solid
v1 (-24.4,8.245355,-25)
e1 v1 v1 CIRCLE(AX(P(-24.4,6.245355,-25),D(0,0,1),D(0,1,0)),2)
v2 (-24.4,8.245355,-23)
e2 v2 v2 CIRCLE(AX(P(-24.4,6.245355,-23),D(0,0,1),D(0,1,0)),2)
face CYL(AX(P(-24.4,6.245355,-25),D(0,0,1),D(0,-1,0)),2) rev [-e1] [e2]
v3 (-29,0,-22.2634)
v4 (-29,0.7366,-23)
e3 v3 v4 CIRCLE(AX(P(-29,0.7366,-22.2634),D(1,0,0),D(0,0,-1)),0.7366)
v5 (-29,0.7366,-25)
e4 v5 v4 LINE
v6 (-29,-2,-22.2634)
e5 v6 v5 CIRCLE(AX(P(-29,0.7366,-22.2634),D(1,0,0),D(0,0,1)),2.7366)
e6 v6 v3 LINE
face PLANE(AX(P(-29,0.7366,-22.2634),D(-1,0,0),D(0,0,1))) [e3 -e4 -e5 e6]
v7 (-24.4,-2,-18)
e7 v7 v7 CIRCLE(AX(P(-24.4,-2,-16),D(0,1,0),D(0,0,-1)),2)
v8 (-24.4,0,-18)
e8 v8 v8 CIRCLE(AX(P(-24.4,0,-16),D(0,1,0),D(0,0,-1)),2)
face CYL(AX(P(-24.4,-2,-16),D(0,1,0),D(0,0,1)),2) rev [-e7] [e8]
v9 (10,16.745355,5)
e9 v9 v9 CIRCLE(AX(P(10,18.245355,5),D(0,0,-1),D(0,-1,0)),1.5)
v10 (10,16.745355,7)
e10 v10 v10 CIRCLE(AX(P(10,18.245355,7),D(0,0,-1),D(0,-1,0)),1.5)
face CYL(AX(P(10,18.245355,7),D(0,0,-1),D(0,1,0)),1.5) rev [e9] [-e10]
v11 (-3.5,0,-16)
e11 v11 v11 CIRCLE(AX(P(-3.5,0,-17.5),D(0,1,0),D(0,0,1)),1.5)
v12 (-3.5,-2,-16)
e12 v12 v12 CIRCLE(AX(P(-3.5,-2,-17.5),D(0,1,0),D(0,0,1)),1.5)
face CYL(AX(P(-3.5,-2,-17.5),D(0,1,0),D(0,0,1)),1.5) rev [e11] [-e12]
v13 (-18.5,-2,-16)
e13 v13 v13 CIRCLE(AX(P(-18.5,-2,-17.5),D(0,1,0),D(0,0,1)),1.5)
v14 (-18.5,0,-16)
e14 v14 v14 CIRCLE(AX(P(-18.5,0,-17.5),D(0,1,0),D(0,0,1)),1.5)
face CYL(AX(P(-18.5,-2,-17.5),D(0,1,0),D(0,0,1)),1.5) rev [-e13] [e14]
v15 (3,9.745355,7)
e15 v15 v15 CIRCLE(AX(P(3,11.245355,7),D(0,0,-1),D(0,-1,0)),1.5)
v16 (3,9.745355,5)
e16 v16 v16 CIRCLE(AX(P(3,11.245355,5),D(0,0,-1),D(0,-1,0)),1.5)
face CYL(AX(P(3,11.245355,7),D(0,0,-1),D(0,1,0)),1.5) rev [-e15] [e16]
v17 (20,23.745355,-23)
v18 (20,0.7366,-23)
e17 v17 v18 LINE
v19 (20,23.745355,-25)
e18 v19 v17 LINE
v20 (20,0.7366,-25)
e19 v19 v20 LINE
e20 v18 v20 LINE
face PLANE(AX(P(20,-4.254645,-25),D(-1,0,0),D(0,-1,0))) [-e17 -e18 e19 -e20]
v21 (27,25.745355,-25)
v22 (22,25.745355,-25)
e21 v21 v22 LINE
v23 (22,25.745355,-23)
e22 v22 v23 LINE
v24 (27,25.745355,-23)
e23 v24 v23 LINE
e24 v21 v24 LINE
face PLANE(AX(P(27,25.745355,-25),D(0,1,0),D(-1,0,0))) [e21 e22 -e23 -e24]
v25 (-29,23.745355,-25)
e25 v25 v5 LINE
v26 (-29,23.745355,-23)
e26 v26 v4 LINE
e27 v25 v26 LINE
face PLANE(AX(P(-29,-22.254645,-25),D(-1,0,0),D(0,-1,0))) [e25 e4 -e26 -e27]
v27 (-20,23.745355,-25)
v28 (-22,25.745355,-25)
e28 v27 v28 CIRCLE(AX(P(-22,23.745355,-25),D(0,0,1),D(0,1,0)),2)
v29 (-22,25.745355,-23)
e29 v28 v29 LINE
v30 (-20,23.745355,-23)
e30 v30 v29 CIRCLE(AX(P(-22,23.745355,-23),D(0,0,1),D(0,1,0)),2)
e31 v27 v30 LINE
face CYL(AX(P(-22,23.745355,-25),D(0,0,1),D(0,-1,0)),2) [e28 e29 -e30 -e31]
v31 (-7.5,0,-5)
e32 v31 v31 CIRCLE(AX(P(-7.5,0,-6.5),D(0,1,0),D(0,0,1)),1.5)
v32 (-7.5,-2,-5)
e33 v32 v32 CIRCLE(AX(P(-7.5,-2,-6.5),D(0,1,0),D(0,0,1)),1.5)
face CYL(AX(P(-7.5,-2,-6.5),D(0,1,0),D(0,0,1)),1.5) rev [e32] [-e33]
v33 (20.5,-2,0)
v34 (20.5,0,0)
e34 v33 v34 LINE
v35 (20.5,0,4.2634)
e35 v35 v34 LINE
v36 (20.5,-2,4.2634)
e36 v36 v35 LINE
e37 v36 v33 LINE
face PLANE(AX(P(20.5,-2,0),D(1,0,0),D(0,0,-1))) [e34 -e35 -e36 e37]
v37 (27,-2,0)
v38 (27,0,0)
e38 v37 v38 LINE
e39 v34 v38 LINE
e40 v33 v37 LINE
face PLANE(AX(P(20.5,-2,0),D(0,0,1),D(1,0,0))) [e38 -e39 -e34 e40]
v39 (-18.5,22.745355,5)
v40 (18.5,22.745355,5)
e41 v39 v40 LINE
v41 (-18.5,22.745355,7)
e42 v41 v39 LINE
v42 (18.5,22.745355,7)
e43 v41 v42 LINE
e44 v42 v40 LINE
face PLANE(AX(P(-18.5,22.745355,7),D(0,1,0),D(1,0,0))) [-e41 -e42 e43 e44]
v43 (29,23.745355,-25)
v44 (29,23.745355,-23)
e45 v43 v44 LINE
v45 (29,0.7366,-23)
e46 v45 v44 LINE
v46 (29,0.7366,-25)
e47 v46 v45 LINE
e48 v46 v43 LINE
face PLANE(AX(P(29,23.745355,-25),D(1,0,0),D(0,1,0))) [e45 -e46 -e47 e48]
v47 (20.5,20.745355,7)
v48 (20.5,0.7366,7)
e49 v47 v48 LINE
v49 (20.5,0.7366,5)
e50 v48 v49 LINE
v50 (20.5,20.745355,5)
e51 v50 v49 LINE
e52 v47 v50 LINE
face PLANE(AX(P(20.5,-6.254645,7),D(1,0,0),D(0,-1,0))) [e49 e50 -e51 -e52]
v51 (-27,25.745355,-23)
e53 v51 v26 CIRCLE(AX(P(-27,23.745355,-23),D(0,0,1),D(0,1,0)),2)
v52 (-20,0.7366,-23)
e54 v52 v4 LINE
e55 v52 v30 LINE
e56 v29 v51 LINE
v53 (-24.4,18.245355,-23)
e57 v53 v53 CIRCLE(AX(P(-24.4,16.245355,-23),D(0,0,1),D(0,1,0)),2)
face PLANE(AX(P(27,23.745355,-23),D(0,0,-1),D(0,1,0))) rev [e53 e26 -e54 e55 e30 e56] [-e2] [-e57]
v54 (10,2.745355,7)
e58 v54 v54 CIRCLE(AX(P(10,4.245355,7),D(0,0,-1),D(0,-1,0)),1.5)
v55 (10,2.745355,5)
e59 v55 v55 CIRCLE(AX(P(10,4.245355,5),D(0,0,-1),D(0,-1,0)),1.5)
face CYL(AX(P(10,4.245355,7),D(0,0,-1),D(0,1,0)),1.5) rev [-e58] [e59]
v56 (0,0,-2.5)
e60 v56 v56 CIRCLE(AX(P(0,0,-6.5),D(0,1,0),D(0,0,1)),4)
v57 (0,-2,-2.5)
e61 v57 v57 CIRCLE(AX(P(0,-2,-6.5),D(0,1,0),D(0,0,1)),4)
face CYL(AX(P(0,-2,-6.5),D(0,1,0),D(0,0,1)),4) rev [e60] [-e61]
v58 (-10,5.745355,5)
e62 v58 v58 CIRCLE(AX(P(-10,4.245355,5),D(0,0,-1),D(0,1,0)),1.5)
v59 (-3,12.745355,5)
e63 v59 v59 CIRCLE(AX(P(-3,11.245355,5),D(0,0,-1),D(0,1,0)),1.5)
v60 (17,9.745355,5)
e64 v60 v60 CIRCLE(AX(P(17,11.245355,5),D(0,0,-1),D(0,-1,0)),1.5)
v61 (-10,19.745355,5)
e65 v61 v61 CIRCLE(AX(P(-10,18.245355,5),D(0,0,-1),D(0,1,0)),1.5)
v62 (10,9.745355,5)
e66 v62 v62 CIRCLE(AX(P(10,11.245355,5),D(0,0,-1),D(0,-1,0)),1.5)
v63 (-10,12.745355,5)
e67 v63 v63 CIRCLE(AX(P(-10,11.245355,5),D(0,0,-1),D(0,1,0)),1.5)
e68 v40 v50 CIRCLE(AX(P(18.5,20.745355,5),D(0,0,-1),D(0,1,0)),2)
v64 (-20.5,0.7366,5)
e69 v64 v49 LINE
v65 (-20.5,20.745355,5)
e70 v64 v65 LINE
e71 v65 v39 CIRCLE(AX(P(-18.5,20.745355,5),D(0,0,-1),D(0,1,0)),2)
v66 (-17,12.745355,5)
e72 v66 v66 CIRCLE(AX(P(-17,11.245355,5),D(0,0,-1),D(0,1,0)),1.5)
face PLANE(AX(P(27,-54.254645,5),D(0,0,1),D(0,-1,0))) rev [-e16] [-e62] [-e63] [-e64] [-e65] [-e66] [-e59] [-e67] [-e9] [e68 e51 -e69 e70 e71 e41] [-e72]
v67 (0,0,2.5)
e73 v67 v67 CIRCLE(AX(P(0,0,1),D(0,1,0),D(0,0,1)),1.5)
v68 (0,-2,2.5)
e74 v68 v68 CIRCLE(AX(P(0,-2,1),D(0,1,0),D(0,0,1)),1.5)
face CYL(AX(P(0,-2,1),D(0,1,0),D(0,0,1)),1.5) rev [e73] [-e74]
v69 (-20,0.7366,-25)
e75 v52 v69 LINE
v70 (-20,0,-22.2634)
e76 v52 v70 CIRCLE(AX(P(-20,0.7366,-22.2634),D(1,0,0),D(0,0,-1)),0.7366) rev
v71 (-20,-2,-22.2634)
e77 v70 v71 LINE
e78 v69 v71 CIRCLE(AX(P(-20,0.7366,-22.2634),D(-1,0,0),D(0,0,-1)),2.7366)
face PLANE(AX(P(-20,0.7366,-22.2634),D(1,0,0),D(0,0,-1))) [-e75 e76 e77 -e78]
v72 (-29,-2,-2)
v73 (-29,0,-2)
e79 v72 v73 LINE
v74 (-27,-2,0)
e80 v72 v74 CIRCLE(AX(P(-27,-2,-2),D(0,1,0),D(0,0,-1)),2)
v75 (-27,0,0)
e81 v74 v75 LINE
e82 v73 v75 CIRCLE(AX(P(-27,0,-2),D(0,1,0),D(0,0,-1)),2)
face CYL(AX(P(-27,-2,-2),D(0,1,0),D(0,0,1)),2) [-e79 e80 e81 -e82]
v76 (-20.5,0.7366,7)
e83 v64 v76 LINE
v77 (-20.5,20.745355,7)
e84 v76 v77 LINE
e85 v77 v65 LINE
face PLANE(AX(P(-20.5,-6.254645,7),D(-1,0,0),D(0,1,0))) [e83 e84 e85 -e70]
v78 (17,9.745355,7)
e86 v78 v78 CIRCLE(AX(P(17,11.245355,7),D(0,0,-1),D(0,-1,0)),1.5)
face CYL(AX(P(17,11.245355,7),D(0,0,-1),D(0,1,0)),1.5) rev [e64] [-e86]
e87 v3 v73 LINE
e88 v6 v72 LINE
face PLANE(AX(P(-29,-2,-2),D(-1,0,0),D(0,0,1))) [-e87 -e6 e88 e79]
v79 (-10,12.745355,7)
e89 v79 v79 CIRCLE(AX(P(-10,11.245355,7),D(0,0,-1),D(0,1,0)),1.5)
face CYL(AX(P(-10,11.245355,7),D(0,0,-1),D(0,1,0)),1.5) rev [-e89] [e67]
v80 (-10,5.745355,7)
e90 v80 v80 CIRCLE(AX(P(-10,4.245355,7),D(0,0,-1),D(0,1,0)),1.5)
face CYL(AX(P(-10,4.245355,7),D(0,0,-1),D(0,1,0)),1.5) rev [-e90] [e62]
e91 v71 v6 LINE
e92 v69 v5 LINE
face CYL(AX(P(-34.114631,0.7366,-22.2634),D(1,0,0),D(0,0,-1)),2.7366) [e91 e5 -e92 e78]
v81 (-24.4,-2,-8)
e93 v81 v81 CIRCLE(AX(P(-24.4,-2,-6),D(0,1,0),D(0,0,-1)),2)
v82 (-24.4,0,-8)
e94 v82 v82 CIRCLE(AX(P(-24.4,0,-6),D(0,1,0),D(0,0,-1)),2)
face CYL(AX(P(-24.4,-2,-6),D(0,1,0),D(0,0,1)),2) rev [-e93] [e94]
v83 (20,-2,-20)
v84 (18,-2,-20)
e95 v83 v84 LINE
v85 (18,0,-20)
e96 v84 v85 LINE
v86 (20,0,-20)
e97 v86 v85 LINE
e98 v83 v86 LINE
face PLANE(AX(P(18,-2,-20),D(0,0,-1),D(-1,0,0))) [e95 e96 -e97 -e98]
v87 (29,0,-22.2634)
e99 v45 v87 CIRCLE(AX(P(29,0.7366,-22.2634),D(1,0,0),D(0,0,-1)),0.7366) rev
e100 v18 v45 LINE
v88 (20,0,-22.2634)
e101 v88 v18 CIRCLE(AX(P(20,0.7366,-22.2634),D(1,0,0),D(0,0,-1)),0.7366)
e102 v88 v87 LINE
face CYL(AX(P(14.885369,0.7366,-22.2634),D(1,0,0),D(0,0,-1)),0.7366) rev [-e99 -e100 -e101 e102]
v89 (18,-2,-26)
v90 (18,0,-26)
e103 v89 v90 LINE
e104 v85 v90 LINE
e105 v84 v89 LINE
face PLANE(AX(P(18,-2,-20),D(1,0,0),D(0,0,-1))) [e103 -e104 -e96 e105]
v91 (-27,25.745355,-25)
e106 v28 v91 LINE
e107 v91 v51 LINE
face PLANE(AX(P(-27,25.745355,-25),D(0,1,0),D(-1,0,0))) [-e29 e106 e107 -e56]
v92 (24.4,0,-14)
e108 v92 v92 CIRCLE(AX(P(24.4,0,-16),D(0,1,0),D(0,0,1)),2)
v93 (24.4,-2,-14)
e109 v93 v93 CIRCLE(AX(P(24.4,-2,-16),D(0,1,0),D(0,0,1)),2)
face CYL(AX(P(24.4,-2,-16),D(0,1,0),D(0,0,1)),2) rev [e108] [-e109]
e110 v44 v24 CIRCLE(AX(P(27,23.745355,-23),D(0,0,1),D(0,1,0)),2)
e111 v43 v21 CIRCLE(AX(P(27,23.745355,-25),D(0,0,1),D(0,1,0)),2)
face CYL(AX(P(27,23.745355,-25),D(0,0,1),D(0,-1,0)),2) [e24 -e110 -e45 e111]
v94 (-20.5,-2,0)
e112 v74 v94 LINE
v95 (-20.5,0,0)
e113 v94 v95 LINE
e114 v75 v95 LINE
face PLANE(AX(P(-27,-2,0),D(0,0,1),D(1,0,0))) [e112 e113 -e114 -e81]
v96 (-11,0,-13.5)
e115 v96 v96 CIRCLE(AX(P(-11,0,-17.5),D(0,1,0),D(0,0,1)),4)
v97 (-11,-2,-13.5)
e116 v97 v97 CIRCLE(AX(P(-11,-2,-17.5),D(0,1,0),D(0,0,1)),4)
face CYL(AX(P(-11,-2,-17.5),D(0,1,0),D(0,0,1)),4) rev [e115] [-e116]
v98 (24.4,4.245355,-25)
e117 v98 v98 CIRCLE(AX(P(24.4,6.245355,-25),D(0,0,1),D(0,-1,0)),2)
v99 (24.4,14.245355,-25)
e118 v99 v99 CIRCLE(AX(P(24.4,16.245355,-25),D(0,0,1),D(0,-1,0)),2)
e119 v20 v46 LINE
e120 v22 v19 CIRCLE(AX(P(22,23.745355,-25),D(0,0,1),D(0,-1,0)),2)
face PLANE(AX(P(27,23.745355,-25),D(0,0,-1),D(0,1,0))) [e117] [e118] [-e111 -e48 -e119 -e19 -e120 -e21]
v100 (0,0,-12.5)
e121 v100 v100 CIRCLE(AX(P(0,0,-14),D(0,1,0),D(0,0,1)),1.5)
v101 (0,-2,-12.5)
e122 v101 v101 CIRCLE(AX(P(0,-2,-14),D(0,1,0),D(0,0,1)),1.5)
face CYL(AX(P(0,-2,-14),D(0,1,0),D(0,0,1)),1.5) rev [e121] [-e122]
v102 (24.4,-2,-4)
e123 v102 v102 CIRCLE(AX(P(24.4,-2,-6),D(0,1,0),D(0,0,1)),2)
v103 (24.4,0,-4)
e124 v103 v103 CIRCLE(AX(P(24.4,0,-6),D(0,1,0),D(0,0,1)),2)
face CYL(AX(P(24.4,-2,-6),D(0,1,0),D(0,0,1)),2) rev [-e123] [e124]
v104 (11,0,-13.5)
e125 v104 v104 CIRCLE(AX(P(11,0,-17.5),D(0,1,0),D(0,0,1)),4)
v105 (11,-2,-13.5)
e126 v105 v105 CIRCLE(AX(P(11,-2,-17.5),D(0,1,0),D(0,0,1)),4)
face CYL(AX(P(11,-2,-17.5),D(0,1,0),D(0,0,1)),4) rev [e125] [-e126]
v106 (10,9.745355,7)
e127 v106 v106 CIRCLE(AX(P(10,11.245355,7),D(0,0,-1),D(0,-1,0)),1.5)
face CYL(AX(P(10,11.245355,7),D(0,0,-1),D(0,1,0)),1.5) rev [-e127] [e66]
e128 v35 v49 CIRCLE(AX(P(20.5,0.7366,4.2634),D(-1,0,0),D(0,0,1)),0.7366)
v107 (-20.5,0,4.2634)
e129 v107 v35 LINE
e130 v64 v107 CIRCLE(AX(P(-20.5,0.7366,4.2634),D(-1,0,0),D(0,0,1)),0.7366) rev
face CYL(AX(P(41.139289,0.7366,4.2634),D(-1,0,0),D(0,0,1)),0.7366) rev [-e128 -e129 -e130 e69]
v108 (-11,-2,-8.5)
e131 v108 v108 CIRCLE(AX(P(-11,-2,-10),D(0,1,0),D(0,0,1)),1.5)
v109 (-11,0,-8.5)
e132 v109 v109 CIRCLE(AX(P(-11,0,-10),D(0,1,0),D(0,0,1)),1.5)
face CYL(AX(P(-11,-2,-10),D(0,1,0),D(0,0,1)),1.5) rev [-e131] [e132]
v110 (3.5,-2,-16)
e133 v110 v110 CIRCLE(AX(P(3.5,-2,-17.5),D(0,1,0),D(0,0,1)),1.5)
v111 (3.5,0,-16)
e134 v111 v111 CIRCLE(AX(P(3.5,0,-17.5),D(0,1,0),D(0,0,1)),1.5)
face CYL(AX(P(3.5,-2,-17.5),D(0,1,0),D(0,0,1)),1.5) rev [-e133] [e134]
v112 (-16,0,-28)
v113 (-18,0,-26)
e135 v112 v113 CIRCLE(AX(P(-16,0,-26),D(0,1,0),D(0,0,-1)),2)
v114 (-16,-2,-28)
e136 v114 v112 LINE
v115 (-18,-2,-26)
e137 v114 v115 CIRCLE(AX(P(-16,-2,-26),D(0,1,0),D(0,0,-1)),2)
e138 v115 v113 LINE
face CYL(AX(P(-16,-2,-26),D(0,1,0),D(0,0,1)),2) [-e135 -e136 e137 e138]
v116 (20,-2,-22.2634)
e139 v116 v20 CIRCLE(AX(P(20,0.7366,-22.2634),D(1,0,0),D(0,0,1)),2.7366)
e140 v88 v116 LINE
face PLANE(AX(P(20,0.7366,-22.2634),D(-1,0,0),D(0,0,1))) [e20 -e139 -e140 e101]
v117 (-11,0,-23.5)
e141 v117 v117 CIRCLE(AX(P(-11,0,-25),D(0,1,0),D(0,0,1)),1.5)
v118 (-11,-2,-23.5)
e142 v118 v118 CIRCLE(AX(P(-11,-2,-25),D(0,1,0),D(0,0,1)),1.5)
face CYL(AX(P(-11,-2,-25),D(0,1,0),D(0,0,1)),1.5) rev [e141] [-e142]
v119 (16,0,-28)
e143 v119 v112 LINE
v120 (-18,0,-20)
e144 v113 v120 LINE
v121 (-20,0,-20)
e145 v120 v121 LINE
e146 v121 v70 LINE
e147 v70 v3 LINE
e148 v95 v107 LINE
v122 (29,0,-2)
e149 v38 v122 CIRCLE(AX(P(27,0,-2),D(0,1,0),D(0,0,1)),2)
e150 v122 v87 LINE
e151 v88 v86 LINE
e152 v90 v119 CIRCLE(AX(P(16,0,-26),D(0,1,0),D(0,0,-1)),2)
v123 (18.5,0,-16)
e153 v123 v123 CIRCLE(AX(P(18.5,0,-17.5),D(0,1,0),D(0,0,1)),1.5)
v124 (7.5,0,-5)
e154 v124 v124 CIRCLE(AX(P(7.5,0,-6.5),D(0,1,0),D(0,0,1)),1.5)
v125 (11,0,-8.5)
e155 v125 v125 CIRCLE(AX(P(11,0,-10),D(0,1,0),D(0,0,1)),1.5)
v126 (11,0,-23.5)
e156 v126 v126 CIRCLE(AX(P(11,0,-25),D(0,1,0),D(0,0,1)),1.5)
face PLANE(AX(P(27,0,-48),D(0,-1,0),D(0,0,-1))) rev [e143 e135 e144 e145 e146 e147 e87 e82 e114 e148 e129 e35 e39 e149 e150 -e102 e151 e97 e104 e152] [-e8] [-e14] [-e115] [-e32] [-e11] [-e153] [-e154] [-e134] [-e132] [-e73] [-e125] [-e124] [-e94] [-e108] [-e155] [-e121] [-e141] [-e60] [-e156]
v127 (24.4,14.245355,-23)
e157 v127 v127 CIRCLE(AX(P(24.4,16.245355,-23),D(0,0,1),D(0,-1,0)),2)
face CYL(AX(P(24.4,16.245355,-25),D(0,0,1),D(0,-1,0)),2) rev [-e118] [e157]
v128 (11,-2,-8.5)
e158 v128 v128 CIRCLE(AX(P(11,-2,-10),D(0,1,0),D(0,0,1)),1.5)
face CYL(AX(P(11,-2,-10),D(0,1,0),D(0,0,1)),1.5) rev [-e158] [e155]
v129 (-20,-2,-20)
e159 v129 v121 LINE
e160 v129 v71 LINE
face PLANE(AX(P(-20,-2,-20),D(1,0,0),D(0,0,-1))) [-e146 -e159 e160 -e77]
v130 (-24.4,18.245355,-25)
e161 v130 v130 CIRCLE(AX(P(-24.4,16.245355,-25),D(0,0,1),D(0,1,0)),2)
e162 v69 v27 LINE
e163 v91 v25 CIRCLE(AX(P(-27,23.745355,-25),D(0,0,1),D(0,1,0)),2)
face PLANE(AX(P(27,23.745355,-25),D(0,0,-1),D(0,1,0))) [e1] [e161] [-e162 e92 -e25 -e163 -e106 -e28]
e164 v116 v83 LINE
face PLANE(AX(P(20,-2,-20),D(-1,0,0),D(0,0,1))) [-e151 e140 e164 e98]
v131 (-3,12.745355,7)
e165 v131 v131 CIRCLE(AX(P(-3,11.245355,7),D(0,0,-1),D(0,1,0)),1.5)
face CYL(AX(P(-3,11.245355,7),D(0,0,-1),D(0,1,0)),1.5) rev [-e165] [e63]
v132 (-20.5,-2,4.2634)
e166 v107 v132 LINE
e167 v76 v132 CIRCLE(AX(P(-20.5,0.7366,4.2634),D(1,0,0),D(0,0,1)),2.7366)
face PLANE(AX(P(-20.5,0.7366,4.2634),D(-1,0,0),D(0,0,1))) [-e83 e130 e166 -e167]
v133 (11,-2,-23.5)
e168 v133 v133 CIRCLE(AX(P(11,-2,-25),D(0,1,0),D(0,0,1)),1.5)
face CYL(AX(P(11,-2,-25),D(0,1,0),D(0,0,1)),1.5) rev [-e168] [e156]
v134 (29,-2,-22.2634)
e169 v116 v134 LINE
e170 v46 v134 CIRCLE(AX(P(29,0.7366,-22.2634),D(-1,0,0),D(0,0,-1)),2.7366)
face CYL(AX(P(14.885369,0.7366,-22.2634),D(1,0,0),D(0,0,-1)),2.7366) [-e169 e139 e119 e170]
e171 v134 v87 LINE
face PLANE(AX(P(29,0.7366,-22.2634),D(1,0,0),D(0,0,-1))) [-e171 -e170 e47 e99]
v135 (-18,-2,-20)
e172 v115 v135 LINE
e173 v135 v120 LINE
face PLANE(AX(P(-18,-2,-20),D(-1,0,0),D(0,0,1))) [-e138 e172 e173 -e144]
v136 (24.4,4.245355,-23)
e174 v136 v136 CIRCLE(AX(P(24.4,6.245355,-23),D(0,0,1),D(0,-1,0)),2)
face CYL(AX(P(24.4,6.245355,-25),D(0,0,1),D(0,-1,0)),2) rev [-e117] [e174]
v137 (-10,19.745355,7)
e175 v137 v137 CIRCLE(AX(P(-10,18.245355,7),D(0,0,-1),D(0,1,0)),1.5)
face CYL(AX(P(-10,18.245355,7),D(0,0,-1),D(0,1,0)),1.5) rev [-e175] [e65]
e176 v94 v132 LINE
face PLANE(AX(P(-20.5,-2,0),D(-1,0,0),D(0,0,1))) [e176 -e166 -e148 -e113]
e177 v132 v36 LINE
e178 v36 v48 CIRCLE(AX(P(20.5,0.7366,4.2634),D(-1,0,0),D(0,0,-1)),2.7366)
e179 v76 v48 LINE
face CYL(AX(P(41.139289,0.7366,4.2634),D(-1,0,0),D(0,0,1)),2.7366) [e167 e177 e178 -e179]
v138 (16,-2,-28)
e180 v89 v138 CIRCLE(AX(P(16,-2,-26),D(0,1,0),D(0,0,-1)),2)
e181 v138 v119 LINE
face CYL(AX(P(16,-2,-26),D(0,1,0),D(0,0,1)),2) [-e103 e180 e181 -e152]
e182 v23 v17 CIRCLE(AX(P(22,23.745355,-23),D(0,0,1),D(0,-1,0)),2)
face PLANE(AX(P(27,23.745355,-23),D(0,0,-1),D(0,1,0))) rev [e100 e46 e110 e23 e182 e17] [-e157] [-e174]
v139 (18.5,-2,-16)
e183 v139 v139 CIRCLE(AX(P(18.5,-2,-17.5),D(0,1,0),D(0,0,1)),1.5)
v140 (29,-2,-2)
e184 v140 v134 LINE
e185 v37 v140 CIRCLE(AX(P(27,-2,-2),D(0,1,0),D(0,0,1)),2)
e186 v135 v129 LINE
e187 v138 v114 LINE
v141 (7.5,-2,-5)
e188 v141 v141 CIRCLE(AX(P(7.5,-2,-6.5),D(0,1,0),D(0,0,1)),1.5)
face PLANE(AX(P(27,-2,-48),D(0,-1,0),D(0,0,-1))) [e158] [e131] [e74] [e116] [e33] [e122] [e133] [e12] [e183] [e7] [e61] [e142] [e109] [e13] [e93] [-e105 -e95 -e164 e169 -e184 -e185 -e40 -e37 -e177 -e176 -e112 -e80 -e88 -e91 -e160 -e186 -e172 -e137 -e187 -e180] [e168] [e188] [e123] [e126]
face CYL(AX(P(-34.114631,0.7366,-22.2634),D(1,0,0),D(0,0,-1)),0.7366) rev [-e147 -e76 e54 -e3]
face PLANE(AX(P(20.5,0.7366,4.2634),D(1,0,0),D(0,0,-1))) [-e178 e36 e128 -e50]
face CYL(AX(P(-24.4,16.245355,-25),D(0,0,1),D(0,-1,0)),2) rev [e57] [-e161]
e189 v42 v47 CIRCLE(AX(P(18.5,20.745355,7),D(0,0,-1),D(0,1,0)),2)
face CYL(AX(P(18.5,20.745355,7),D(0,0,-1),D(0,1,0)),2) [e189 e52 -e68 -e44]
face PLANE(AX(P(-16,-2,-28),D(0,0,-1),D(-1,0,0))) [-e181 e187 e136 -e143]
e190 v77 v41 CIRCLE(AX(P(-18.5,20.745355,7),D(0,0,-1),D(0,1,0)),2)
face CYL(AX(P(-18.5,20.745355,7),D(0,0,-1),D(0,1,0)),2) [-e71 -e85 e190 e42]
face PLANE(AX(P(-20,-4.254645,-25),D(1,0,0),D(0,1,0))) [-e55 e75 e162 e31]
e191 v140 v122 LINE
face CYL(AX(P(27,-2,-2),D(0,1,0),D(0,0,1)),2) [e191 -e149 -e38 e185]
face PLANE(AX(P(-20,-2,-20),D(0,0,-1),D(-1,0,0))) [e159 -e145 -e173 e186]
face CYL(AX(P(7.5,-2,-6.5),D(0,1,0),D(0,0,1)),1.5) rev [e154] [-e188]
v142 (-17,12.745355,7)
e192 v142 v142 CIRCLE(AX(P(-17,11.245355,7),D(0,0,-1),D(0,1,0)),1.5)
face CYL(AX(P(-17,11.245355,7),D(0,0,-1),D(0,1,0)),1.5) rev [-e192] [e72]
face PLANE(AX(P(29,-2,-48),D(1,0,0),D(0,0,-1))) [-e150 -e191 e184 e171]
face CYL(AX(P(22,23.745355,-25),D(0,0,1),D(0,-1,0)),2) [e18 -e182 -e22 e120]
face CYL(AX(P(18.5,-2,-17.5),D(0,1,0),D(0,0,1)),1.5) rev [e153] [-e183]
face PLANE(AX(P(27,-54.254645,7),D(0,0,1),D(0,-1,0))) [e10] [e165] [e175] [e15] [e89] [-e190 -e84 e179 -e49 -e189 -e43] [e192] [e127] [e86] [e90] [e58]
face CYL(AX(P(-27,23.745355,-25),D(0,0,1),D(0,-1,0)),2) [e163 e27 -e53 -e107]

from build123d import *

# Parameters (mm, degrees)
SKETCH1_R                    = 1.5
SKETCH1_R_2                  = 2
SKETCH1_R_3                  = 4
BASE_FLANGE1_DEPTH           = 2
SKETCHED_START               = -20.5
SKETCHED_BEND1_DEPTH         = 41
SKETCHED_START_2             = -29
SKETCHED_BEND1_2_DEPTH       = 9
SKETCHED_START_3             = 20
SKETCHED_BEND1_3_DEPTH       = 9
SKETCHED_BEND1_4_DEPTH       = 41
SKETCHED_BEND1_5_DEPTH       = 9
SKETCHED_BEND1_6_DEPTH       = 9
SKETCHED_START_4             = -26
SKETCHED_BEND1_7_OUTLINE_R   = 1.5
SKETCHED_BEND1_7_OUTLINE_R_2 = 2
SKETCHED_BEND1_7_DEPTH       = 33
SKETCHED_START_5             = 5
SKETCHED_BEND1_8_DEPTH       = 2


with BuildPart() as part:
    # Base-Flange1: sheet metal written as solids
    # Sketch1 → Base-Flange1 (new body)
    with BuildSketch(Plane(origin=(0, 0, 0), x_dir=(1, 0, 0), z_dir=(0, 1, 0))):
        with BuildLine():
            Line((-27, 0), (-20.5, 0))
            Line((-20.5, 0), (-20.5, -27))
            ThreePointArc((-20.5, -27), (-19.914213562, -28.414213562), (-18.5, -29))
            Line((-18.5, -29), (18.5, -29))
            ThreePointArc((18.5, -29), (19.914213562, -28.414213562), (20.5, -27))
            Line((20.5, -27), (20.5, 0))
            Line((20.5, 0), (27, 0))
            ThreePointArc((27, 0), (28.414213562, 0.585786438), (29, 2))
            Line((29, 2), (29, 48))
            ThreePointArc((29, 48), (28.414213562, 49.414213562), (27, 50))
            Line((27, 50), (22, 50))
            ThreePointArc((22, 50), (20.585786438, 49.414213562), (20, 48))
            Line((20, 48), (20, 20))
            Line((20, 20), (18, 20))
            Line((18, 20), (18, 26))
            ThreePointArc((18, 26), (17.414213562, 27.414213562), (16, 28))
            Line((16, 28), (-16, 28))
            ThreePointArc((-16, 28), (-17.414213562, 27.414213562), (-18, 26))
            Line((-18, 26), (-18, 20))
            Line((-18, 20), (-20, 20))
            Line((-20, 20), (-20, 48))
            ThreePointArc((-20, 48), (-20.585786438, 49.414213562), (-22, 50))
            Line((-22, 50), (-27, 50))
            ThreePointArc((-27, 50), (-28.414213562, 49.414213562), (-29, 48))
            Line((-29, 48), (-29, 2))
            ThreePointArc((-29, 2), (-28.414213562, 0.585786438), (-27, 0))
        make_face()
        with Locations(Location((-17, -17.5, 0), (0, 0, 270))):
            Circle(SKETCH1_R, mode=Mode.SUBTRACT)
        with Locations(Location((-10, -17.5, 0), (0, 0, 270))):
            Circle(SKETCH1_R, mode=Mode.SUBTRACT)
        with Locations(Location((-10, -10.5, 0), (0, 0, 270))):
            Circle(SKETCH1_R, mode=Mode.SUBTRACT)
        with Locations(Location((-3, -17.5, 0), (0, 0, 270))):
            Circle(SKETCH1_R, mode=Mode.SUBTRACT)
        with Locations(Location((-10, -24.5, 0), (0, 0, 270))):
            Circle(SKETCH1_R, mode=Mode.SUBTRACT)
        with Locations(Location((24.4, 40.5, 0), (0, 0, 270))):
            Circle(SKETCH1_R_2, mode=Mode.SUBTRACT)
        with Locations(Location((24.4, 30.5, 0), (0, 0, 270))):
            Circle(SKETCH1_R_2, mode=Mode.SUBTRACT)
        with Locations(Location((-24.4, 30.5, 0), (0, 0, 90))):
            Circle(SKETCH1_R_2, mode=Mode.SUBTRACT)
        with Locations(Location((-24.4, 40.5, 0), (0, 0, 90))):
            Circle(SKETCH1_R_2, mode=Mode.SUBTRACT)
        with Locations(Location((24.4, 6, 0), (0, 0, 270))):
            Circle(SKETCH1_R_2, mode=Mode.SUBTRACT)
        with Locations(Location((24.4, 16, 0), (0, 0, 270))):
            Circle(SKETCH1_R_2, mode=Mode.SUBTRACT)
        with Locations(Location((-24.4, 16, 0), (0, 0, 90))):
            Circle(SKETCH1_R_2, mode=Mode.SUBTRACT)
        with Locations(Location((-24.4, 6, 0), (0, 0, 90))):
            Circle(SKETCH1_R_2, mode=Mode.SUBTRACT)
        with Locations(Location((0, -1, 0), (0, 0, 270))):
            Circle(SKETCH1_R, mode=Mode.SUBTRACT)
        with Locations(Location((0, 6.5, 0), (0, 0, 270))):
            Circle(SKETCH1_R_3, mode=Mode.SUBTRACT)
        with Locations(Location((-7.5, 6.5, 0), (0, 0, 270))):
            Circle(SKETCH1_R, mode=Mode.SUBTRACT)
        with Locations(Location((0, 14, 0), (0, 0, 270))):
            Circle(SKETCH1_R, mode=Mode.SUBTRACT)
        with Locations(Location((7.5, 6.5, 0), (0, 0, 270))):
            Circle(SKETCH1_R, mode=Mode.SUBTRACT)
        with Locations(Location((-3.5, 17.5, 0), (0, 0, 270))):
            Circle(SKETCH1_R, mode=Mode.SUBTRACT)
        with Locations(Location((-11, 17.5, 0), (0, 0, 270))):
            Circle(SKETCH1_R_3, mode=Mode.SUBTRACT)
        with Locations(Location((-11, 25, 0), (0, 0, 270))):
            Circle(SKETCH1_R, mode=Mode.SUBTRACT)
        with Locations(Location((-18.5, 17.5, 0), (0, 0, 270))):
            Circle(SKETCH1_R, mode=Mode.SUBTRACT)
        with Locations(Location((-11, 10, 0), (0, 0, 270))):
            Circle(SKETCH1_R, mode=Mode.SUBTRACT)
        with Locations(Location((3.5, 17.5, 0), (0, 0, 270))):
            Circle(SKETCH1_R, mode=Mode.SUBTRACT)
        with Locations(Location((11, 17.5, 0), (0, 0, 270))):
            Circle(SKETCH1_R_3, mode=Mode.SUBTRACT)
        with Locations(Location((11, 10, 0), (0, 0, 270))):
            Circle(SKETCH1_R, mode=Mode.SUBTRACT)
        with Locations(Location((18.5, 17.5, 0), (0, 0, 270))):
            Circle(SKETCH1_R, mode=Mode.SUBTRACT)
        with Locations(Location((11, 25, 0), (0, 0, 270))):
            Circle(SKETCH1_R, mode=Mode.SUBTRACT)
        with Locations(Location((10, -10.5, 0), (0, 0, 90))):
            Circle(SKETCH1_R, mode=Mode.SUBTRACT)
        with Locations(Location((10, -24.5, 0), (0, 0, 90))):
            Circle(SKETCH1_R, mode=Mode.SUBTRACT)
        with Locations(Location((3, -17.5, 0), (0, 0, 90))):
            Circle(SKETCH1_R, mode=Mode.SUBTRACT)
        with Locations(Location((10, -17.5, 0), (0, 0, 90))):
            Circle(SKETCH1_R, mode=Mode.SUBTRACT)
        with Locations(Location((17, -17.5, 0), (0, 0, 90))):
            Circle(SKETCH1_R, mode=Mode.SUBTRACT)
    extrude(amount=-BASE_FLANGE1_DEPTH)

    # Sketched Bend1: read off the stored shape, not the designer's step
    # Sketched Bend1 outline → Sketched Bend1 (cut)
    with BuildSketch(Plane.YZ.offset(SKETCHED_START)):
        with BuildLine():
            Line((-2, 29), (-2, 4.2634))
            ThreePointArc((-2, 4.2634), (-1.443395312, 5.917667209), (0, 6.899002398))
            Line((0, 6.899002398), (0, 29))
            Line((0, 29), (-2, 29))
        make_face()
    extrude(amount=SKETCHED_BEND1_DEPTH, mode=Mode.SUBTRACT)

    # Sketched Bend1 2 outline → Sketched Bend1 2 (cut)
    with BuildSketch(Plane.YZ.offset(SKETCHED_START_2)):
        with BuildLine():
            ThreePointArc((0, -24.899002398), (-1.443395312, -23.917667209), (-2, -22.2634))
            Line((-2, -22.2634), (-2, -50))
            Line((-2, -50), (0, -50))
            Line((0, -50), (0, -24.899002398))
        make_face()
    extrude(amount=SKETCHED_BEND1_2_DEPTH, mode=Mode.SUBTRACT)

    # Sketched Bend1 3 outline → Sketched Bend1 3 (cut)
    with BuildSketch(Plane.YZ.offset(SKETCHED_START_3)):
        with BuildLine():
            ThreePointArc((0, -24.899002398), (-1.443395312, -23.917667209), (-2, -22.2634))
            Line((-2, -22.2634), (-2, -50))
            Line((-2, -50), (0, -50))
            Line((0, -50), (0, -24.899002398))
        make_face()
    extrude(amount=SKETCHED_BEND1_3_DEPTH, mode=Mode.SUBTRACT)

    # Sketched Bend1 4 outline → Sketched Bend1 4 (add)
    with BuildSketch(Plane.YZ.offset(SKETCHED_START)):
        with BuildLine():
            ThreePointArc((0.7366, 7), (0.364854094, 6.974633029), (0, 6.899002398))
            Line((0, 6.899002398), (0, 4.2634))
            ThreePointArc((0, 4.2634), (0.215745145, 4.784254855), (0.7366, 5))
            Line((0.7366, 5), (22.745355099, 5))
            Line((22.745355099, 5), (22.745355099, 7))
            Line((22.745355099, 7), (0.7366, 7))
        make_face()
    extrude(amount=SKETCHED_BEND1_4_DEPTH)

    # Sketched Bend1 5 outline → Sketched Bend1 5 (add)
    with BuildSketch(Plane.YZ.offset(SKETCHED_START_2)):
        with BuildLine():
            Line((0, -22.2634), (0, -24.899002398))
            ThreePointArc((0, -24.899002398), (0.364854094, -24.974633029), (0.7366, -25))
            Line((0.7366, -25), (25.745355099, -25))
            Line((25.745355099, -25), (25.745355099, -23))
            Line((25.745355099, -23), (0.7366, -23))
            ThreePointArc((0.7366, -23), (0.215745145, -22.784254855), (0, -22.2634))
        make_face()
    extrude(amount=SKETCHED_BEND1_5_DEPTH)

    # Sketched Bend1 6 outline → Sketched Bend1 6 (add)
    with BuildSketch(Plane.YZ.offset(SKETCHED_START_3)):
        with BuildLine():
            Line((0, -22.2634), (0, -24.899002398))
            ThreePointArc((0, -24.899002398), (0.364854094, -24.974633029), (0.7366, -25))
            Line((0.7366, -25), (25.745355099, -25))
            Line((25.745355099, -25), (25.745355099, -23))
            Line((25.745355099, -23), (0.7366, -23))
            ThreePointArc((0.7366, -23), (0.215745145, -22.784254855), (0, -22.2634))
        make_face()
    extrude(amount=SKETCHED_BEND1_6_DEPTH)

    # Sketched Bend1 7 outline → Sketched Bend1 7 (cut)
    with BuildSketch(Plane.XY.offset(SKETCHED_START_4)):
        with BuildLine():
            ThreePointArc((-29, 23.745355099), (-28.414213562, 25.159568661), (-27, 25.745355099))
            Line((-27, 25.745355099), (-29, 25.745355099))
            Line((-29, 25.745355099), (-29, 23.745355099))
        make_face()
        with BuildLine():
            ThreePointArc((-22, 25.745355099), (-20.585786438, 25.159568661), (-20, 23.745355099))
            Line((-20, 23.745355099), (-20, 25.745355099))
            Line((-20, 25.745355099), (-22, 25.745355099))
        make_face()
        with BuildLine():
            Line((29, 25.745355099), (27, 25.745355099))
            ThreePointArc((27, 25.745355099), (28.414213562, 25.159568661), (29, 23.745355099))
            Line((29, 23.745355099), (29, 25.745355099))
        make_face()
        with BuildLine():
            Line((20, 25.745355099), (20, 23.745355099))
            ThreePointArc((20, 23.745355099), (20.585786438, 25.159568661), (22, 25.745355099))
            Line((22, 25.745355099), (20, 25.745355099))
        make_face()
        with BuildLine():
            Line((20, 22.745355099), (18.5, 22.745355099))
            ThreePointArc((18.5, 22.745355099), (19.322875656, 22.568230754), (20, 22.068230754))
            Line((20, 22.068230754), (20, 22.745355099))
        make_face()
        with BuildLine():
            Line((-20, 22.745355099), (-20, 22.068230754))
            ThreePointArc((-20, 22.068230754), (-19.322875656, 22.568230754), (-18.5, 22.745355099))
            Line((-18.5, 22.745355099), (-20, 22.745355099))
        make_face()
        with Locations((17, 11.245355099)):
            Circle(SKETCHED_BEND1_7_OUTLINE_R)
        with Locations((-10, 18.245355099)):
            Circle(SKETCHED_BEND1_7_OUTLINE_R)
        with Locations((-3, 11.245355099)):
            Circle(SKETCHED_BEND1_7_OUTLINE_R)
        with Locations((-10, 4.245355099)):
            Circle(SKETCHED_BEND1_7_OUTLINE_R)
        with Locations((-17, 11.245355099)):
            Circle(SKETCHED_BEND1_7_OUTLINE_R)
        with Locations((10, 11.245355099)):
            Circle(SKETCHED_BEND1_7_OUTLINE_R)
        with Locations((3, 11.245355099)):
            Circle(SKETCHED_BEND1_7_OUTLINE_R)
        with Locations((10, 18.245355099)):
            Circle(SKETCHED_BEND1_7_OUTLINE_R)
        with Locations((-10, 11.245355099)):
            Circle(SKETCHED_BEND1_7_OUTLINE_R)
        with Locations((10, 4.245355099)):
            Circle(SKETCHED_BEND1_7_OUTLINE_R)
        with Locations((24.4, 16.245355099)):
            Circle(SKETCHED_BEND1_7_OUTLINE_R_2)
        with Locations((24.4, 6.245355099)):
            Circle(SKETCHED_BEND1_7_OUTLINE_R_2)
        with Locations((-24.4, 6.245355099)):
            Circle(SKETCHED_BEND1_7_OUTLINE_R_2)
        with Locations((-24.4, 16.245355099)):
            Circle(SKETCHED_BEND1_7_OUTLINE_R_2)
    extrude(amount=SKETCHED_BEND1_7_DEPTH, mode=Mode.SUBTRACT)

    # Sketched Bend1 8 outline → Sketched Bend1 8 (cut)
    with BuildSketch(Plane.XY.offset(SKETCHED_START_5)):
        with BuildLine():
            Line((-20.5, 22.745355099), (-20.5, 20.745355099))
            ThreePointArc((-20.5, 20.745355099), (-20.370828693, 21.45246188), (-20, 22.068230754))
            Line((-20, 22.068230754), (-20, 22.745355099))
            Line((-20, 22.745355099), (-20.5, 22.745355099))
        make_face()
        with BuildLine():
            Line((20, 22.745355099), (20, 22.068230754))
            ThreePointArc((20, 22.068230754), (20.370828693, 21.45246188), (20.5, 20.745355099))
            Line((20.5, 20.745355099), (20.5, 22.745355099))
            Line((20.5, 22.745355099), (20, 22.745355099))
        make_face()
    extrude(amount=SKETCHED_BEND1_8_DEPTH, mode=Mode.SUBTRACT)


solid = part.part
